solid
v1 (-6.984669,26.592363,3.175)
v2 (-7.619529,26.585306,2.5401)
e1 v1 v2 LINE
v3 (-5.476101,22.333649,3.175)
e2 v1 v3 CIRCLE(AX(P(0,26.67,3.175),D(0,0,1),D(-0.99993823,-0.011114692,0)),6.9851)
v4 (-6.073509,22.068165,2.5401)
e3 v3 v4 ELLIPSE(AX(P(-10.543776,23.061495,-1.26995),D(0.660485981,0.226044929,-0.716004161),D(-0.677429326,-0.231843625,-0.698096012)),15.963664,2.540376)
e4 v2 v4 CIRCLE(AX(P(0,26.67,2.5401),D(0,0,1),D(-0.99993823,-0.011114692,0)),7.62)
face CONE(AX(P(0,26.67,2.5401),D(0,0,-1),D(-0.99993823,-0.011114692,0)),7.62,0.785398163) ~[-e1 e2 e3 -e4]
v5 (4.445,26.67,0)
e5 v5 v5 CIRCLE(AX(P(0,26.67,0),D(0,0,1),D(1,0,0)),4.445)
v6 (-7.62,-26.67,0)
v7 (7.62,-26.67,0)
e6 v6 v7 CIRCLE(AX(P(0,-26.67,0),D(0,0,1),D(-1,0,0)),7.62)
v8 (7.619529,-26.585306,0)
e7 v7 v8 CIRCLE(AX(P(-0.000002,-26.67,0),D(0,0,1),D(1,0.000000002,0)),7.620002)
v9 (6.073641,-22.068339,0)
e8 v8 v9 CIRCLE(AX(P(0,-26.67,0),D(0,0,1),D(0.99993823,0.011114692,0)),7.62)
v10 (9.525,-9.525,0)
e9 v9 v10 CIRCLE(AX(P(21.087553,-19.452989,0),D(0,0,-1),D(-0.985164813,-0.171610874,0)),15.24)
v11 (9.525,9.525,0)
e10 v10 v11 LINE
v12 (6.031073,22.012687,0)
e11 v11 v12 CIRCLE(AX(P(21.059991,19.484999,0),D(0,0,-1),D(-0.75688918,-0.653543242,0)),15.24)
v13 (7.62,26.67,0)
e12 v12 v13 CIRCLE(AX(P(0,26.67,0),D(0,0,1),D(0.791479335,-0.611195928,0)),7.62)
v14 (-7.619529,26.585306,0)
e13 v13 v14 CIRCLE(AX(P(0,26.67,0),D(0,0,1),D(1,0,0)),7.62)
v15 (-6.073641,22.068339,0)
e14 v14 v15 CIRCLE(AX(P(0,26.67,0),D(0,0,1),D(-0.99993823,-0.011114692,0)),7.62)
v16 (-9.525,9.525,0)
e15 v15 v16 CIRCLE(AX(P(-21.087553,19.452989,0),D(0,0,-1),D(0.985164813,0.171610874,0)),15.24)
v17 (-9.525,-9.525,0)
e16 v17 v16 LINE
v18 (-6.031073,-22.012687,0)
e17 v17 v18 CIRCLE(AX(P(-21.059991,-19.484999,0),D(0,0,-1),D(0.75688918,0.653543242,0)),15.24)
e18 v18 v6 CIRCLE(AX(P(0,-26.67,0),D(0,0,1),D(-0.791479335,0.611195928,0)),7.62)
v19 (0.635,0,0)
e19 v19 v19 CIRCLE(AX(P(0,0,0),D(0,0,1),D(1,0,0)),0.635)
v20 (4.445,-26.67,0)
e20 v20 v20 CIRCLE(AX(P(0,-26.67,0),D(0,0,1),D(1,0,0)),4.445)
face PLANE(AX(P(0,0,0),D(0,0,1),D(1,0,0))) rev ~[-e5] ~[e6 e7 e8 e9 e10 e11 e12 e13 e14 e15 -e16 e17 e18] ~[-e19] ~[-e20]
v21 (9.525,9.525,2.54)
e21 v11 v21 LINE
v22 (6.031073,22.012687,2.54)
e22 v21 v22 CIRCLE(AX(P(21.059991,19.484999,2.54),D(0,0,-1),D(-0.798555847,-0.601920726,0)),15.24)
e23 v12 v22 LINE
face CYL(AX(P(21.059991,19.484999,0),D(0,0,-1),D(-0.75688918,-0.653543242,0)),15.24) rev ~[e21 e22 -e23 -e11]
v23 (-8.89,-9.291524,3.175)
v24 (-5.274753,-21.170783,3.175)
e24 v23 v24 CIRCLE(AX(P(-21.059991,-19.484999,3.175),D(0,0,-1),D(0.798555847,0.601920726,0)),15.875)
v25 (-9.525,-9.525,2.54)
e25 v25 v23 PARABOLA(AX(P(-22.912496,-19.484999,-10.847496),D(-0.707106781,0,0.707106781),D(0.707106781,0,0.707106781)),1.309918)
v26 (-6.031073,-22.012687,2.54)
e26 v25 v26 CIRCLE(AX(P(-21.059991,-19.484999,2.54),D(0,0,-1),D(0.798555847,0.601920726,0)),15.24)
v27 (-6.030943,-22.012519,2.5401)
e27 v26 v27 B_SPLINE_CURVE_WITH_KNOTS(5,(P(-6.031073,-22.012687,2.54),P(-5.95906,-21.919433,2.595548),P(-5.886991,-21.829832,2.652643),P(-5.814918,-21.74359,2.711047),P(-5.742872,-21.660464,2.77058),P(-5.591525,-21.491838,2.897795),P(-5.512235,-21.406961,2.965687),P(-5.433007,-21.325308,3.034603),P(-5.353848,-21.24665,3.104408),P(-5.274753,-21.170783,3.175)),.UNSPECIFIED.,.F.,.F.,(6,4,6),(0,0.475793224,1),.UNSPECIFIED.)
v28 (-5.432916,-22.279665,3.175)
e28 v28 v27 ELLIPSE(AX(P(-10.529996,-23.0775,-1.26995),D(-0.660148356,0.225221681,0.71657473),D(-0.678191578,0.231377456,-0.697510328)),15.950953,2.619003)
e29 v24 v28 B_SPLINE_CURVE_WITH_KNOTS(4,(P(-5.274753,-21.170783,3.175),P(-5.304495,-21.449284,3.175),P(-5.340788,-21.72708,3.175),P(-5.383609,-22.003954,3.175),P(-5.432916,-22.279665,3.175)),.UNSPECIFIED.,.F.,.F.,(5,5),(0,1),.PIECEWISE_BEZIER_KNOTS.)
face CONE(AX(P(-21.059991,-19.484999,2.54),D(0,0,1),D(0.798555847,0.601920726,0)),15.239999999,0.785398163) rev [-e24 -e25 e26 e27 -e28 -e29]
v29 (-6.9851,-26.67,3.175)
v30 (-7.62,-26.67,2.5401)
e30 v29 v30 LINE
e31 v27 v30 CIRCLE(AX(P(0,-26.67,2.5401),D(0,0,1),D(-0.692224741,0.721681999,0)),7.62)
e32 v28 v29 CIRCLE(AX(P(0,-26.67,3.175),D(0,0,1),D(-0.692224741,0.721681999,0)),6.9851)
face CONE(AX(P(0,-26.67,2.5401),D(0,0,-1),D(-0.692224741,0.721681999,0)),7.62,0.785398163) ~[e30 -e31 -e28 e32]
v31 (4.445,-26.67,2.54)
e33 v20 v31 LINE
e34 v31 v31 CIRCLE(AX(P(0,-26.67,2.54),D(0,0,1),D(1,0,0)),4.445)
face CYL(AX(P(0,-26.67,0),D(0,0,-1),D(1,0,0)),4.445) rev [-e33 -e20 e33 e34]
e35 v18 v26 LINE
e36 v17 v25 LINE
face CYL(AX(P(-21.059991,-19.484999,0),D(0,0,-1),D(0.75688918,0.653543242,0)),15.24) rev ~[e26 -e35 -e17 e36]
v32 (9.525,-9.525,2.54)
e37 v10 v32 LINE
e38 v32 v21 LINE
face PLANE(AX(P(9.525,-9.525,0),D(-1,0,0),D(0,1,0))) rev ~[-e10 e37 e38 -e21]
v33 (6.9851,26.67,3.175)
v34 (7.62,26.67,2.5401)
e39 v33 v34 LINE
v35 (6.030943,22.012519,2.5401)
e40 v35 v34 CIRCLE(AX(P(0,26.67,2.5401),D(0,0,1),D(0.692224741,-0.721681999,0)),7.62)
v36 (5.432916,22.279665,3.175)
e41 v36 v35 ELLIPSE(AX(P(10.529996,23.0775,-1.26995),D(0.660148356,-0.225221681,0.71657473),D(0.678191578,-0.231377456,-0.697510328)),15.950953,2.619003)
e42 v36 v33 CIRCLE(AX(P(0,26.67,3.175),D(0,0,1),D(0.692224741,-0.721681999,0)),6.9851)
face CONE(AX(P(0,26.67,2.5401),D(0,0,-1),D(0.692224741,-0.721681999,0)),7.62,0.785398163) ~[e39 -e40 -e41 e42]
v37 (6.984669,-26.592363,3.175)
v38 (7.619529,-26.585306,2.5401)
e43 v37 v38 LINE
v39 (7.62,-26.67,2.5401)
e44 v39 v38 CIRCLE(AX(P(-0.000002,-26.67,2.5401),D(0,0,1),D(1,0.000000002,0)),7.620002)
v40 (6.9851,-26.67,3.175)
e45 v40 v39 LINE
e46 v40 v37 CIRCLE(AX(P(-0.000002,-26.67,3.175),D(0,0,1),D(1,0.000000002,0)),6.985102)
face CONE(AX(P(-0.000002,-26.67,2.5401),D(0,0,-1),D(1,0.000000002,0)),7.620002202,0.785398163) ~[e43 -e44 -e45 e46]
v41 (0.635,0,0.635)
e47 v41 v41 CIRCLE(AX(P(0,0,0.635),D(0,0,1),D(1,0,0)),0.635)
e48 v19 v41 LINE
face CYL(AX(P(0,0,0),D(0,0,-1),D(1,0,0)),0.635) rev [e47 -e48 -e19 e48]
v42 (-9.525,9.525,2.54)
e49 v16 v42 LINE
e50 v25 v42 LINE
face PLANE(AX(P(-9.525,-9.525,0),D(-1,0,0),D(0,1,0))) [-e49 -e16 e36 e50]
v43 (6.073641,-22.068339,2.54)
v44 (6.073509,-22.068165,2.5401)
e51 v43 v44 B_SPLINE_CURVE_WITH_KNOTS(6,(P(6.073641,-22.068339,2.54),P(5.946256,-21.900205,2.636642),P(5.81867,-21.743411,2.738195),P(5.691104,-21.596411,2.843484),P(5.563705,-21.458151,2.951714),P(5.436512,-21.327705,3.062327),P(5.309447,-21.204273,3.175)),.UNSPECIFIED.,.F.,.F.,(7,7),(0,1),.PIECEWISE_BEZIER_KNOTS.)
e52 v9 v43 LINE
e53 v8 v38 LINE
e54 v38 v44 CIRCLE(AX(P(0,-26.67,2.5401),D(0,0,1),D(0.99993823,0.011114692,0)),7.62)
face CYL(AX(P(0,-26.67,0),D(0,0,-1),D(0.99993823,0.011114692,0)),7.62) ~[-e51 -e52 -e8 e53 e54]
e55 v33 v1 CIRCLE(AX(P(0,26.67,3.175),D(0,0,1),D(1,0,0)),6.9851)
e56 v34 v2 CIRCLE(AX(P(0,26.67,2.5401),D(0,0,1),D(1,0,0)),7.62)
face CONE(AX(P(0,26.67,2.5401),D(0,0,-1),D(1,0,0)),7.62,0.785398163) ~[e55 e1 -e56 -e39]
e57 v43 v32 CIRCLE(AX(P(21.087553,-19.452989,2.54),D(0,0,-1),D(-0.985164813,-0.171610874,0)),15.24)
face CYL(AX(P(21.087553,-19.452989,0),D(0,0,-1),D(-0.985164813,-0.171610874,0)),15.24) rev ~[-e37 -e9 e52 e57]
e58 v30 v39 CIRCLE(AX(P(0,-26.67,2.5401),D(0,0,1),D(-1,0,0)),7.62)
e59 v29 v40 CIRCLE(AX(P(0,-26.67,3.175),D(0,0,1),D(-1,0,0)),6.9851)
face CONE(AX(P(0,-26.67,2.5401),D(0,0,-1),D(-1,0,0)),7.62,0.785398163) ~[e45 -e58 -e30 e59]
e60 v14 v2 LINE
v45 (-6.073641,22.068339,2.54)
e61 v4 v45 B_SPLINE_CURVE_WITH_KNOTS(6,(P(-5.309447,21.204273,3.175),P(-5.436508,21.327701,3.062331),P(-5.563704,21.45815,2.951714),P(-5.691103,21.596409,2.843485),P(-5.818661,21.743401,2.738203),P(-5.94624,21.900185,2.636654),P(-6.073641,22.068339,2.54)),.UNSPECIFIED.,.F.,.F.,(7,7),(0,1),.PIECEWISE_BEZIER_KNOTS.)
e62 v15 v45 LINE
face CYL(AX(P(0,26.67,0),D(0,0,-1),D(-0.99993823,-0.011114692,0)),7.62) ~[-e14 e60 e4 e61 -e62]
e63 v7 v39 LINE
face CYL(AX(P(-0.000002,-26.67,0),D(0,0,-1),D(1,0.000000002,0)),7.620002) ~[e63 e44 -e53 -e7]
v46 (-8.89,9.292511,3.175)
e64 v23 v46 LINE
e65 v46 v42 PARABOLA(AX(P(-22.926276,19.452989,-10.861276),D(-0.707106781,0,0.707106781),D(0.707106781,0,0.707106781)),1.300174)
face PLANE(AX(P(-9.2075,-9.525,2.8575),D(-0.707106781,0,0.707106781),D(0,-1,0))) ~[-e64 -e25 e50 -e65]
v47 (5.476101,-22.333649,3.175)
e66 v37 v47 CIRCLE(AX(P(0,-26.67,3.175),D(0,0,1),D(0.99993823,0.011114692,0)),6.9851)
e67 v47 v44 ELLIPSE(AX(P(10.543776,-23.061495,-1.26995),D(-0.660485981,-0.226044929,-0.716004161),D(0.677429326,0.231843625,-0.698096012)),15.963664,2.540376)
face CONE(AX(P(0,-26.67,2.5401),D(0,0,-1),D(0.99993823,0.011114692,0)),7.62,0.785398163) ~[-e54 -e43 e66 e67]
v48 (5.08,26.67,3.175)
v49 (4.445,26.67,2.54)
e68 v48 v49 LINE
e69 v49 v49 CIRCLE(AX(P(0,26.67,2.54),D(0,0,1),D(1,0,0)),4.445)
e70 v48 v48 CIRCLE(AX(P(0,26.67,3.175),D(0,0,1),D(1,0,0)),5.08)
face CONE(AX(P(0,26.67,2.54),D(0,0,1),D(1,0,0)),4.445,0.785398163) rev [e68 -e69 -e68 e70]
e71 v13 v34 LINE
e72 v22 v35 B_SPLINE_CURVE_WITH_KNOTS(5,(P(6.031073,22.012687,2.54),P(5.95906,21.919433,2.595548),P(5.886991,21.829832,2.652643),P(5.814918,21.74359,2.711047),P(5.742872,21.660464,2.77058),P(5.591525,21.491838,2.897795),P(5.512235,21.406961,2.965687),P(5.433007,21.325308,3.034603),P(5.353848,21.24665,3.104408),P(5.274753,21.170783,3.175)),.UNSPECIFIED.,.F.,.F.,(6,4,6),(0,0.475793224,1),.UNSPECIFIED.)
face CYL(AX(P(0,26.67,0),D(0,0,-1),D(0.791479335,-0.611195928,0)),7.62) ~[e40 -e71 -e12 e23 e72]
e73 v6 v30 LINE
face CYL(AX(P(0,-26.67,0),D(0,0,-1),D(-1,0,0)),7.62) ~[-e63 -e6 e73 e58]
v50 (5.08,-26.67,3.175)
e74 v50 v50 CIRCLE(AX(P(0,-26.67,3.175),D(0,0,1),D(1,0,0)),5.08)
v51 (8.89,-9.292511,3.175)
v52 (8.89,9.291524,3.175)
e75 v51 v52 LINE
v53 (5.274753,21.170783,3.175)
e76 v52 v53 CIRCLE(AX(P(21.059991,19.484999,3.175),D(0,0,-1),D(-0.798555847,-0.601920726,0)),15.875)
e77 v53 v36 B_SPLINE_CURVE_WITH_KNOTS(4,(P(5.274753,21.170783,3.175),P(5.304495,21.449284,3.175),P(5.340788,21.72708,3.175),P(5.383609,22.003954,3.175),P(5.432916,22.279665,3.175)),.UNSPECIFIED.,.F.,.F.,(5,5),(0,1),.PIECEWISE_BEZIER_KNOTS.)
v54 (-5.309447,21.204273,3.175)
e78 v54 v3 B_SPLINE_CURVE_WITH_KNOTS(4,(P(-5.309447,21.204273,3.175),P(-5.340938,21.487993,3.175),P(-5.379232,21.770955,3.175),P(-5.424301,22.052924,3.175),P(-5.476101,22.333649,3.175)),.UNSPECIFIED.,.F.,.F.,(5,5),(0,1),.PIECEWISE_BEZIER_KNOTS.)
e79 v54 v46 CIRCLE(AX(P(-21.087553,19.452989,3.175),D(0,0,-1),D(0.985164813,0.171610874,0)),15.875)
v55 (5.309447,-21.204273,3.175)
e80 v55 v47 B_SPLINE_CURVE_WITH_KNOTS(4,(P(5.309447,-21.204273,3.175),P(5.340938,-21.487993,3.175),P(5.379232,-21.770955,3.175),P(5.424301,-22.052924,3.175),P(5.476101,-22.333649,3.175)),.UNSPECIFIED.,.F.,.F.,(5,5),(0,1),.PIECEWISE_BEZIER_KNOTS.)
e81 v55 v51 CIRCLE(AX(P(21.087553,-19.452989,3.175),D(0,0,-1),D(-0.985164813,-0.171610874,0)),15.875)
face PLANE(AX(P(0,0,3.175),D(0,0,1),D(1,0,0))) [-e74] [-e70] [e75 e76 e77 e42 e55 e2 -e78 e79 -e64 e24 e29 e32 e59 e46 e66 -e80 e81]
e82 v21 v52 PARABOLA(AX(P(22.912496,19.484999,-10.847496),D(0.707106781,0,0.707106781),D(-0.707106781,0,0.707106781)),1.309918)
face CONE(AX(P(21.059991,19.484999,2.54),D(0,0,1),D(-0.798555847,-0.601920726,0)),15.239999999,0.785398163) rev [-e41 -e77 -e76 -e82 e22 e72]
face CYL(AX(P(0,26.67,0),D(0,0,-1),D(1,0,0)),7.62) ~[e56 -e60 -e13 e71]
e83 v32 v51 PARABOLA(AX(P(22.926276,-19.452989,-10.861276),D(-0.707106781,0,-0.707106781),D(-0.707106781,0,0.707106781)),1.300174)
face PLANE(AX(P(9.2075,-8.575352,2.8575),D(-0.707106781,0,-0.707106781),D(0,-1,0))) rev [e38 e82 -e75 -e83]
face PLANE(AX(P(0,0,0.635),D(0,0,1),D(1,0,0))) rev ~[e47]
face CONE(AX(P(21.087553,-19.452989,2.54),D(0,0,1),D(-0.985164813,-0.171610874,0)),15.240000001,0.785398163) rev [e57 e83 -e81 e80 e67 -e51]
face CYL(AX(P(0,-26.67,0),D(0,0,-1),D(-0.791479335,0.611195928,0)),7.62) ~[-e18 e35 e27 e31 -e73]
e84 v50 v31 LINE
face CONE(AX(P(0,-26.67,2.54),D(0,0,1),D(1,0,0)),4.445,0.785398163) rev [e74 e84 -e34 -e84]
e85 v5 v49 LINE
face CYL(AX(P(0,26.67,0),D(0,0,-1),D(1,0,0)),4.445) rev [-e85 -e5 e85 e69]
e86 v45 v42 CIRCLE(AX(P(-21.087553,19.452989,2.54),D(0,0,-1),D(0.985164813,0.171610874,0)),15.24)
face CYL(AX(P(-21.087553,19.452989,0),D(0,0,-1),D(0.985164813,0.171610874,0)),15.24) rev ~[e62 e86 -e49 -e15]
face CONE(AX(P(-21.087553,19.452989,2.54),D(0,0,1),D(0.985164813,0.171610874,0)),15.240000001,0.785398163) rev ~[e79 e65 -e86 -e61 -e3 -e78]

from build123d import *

# Parameters (mm, degrees)
F0_W        = 19.05
F0_H        = 19.05
F0_R        = 0.635
F0_R_2      = 4.445
F1_DEPTH    = 3.175
F2_C1_SIZE  = 0.635
F2_C2_SIZE  = 0.635
F2_C3_SIZE  = 0.635
F2_C4_SIZE  = 0.635
F2_C5_SIZE  = 0.635
F2_C6_SIZE  = 0.635
F2_C7_SIZE  = 0.635
F2_C8_SIZE  = 0.635
F2_C9_SIZE  = 0.6349
F2_C10_SIZE = 0.6349
F3_DEPTH    = 0.635


# Not quite as in the source:
# - a fillet or chamfer is up to 0.001 mm smaller than in the source, because OpenCascade refuses the exact size


with BuildPart() as f1:
    # F0 (on Top) → F1 (new body)
    with BuildSketch(Plane.XY):
        Rectangle(F0_W, F0_H)
        Circle(F0_R, mode=Mode.SUBTRACT)
        with BuildLine():
            Line((9.525, -9.525), (-9.525, -9.525))
            ThreePointArc((-9.525, -9.525), (-6.3836187271, -15.3786997104), (-6.0310725347, -22.012687032))
            ThreePointArc((-6.0310725347, -22.012687032), (0.0350329382, -19.0500805324), (6.0736411029, -22.0683390224))
            ThreePointArc((6.0736411029, -22.0683390224), (6.3936440411, -15.409890989), (9.525, -9.525))
        make_face()
        with BuildLine():
            ThreePointArc((6.0736411029, -22.0683390224), (0.0350329382, -19.0500805324), (-6.0310725347, -22.012687032))
            ThreePointArc((-6.0310725347, -22.012687032), (-6.6363180101, -24.4058987838), (-7.62, -26.67))
            ThreePointArc((-7.62, -26.67), (0, -34.29), (7.62, -26.67))
            ThreePointArc((7.62, -26.67), (7.619882327, -26.6276523681), (7.6195293118, -26.5853060441))
            ThreePointArc((7.6195293118, -26.5853060441), (6.6686101992, -24.3877327559), (6.0736411029, -22.0683390224))
        make_face()
        with Locations((0, -26.67)):
            Circle(F0_R_2, mode=Mode.SUBTRACT)
        with BuildLine():
            ThreePointArc((-7.62, -26.67), (-6.6363180101, -24.4058987838), (-6.0310725347, -22.012687032))
            ThreePointArc((-6.0310725347, -22.012687032), (-7.2118365454, -24.2095501137), (-7.62, -26.67))
        make_face()
        with BuildLine():
            ThreePointArc((7.6195293118, -26.5853060441), (7.2094713239, -24.202628275), (6.0736411029, -22.0683390224))
            ThreePointArc((6.0736411029, -22.0683390224), (6.6686101992, -24.3877327559), (7.6195293118, -26.5853060441))
        make_face()
        with BuildLine():
            ThreePointArc((-6.0736411029, 22.0683390224), (-6.3936440411, 15.409890989), (-9.525, 9.525))
            Line((-9.525, 9.525), (9.525, 9.525))
            ThreePointArc((9.525, 9.525), (6.3836187271, 15.3786997104), (6.0310725347, 22.012687032))
            ThreePointArc((6.0310725347, 22.012687032), (-0.0350329382, 19.0500805324), (-6.0736411029, 22.0683390224))
        make_face()
        with BuildLine():
            ThreePointArc((-7.6195293118, 26.5853060441), (-6.6686101992, 24.3877327559), (-6.0736411029, 22.0683390224))
            ThreePointArc((-6.0736411029, 22.0683390224), (-0.0350329382, 19.0500805324), (6.0310725347, 22.012687032))
            ThreePointArc((6.0310725347, 22.012687032), (6.6363180101, 24.4058987838), (7.62, 26.67))
            ThreePointArc((7.62, 26.67), (-0.0423476319, 34.289882327), (-7.6195293118, 26.5853060441))
        make_face()
        with Locations((0, 26.67)):
            Circle(F0_R_2, mode=Mode.SUBTRACT)
        with BuildLine():
            ThreePointArc((-7.6195293118, 26.5853060441), (-7.2094713239, 24.202628275), (-6.0736411029, 22.0683390224))
            ThreePointArc((-6.0736411029, 22.0683390224), (-6.6686101992, 24.3877327559), (-7.6195293118, 26.5853060441))
        make_face()
        with BuildLine():
            ThreePointArc((7.62, 26.67), (6.6363180101, 24.4058987838), (6.0310725347, 22.012687032))
            ThreePointArc((6.0310725347, 22.012687032), (7.2118365454, 24.2095501137), (7.62, 26.67))
        make_face()
        Circle(F0_R)
    extrude(amount=F1_DEPTH)

    # F2: chamfer of 0.635 on 10 edges, made by hand

    # F2_c1
    f2_c1_edges = [f1.edges().sort_by_distance(p)[0] for p in [
        (-9.525, 0, 3.175),
    ]]
    chamfer(f2_c1_edges, length=F2_C1_SIZE)

    # F2_c2
    f2_c2_edges = [f1.edges().sort_by_distance(p)[0] for p in [
        (-6.2554888364, -15.867774564, 3.175),
    ]]
    chamfer(f2_c2_edges, length=F2_C2_SIZE)

    # F2_c3
    f2_c3_edges = [f1.edges().sort_by_distance(p)[0] for p in [
        (6.3936440411, -15.409890989, 3.175),
    ]]
    chamfer(f2_c3_edges, length=F2_C3_SIZE)

    # F2_c4
    f2_c4_edges = [f1.edges().sort_by_distance(p)[0] for p in [
        (9.525, 0.4748240758, 3.175),
    ]]
    chamfer(f2_c4_edges, length=F2_C4_SIZE)

    # F2_c5
    f2_c5_edges = [f1.edges().sort_by_distance(p)[0] for p in [
        (6.2554888364, 15.867774564, 3.175),
    ]]
    chamfer(f2_c5_edges, length=F2_C5_SIZE)

    # F2_c6
    f2_c6_edges = [f1.edges().sort_by_distance(p)[0] for p in [
        (-6.2671958343, 15.9012829536, 3.175),
    ]]
    chamfer(f2_c6_edges, length=F2_C6_SIZE)

    # F2_c7
    f2_c7_edges = [f1.edges().sort_by_distance(p)[0] for p in [
        (-4.445, -26.67, 3.175),
    ]]
    chamfer(f2_c7_edges, length=F2_C7_SIZE)

    # F2_c8
    f2_c8_edges = [f1.edges().sort_by_distance(p)[0] for p in [
        (-4.445, 26.67, 3.175),
    ]]
    chamfer(f2_c8_edges, length=F2_C8_SIZE)

    # F2_c9 (size 0.635 in the source; OpenCascade refuses exactly that, so slightly less here)
    f2_c9_edges = [f1.edges().sort_by_distance(p)[0] for p in [
        (-0.0350329382, -34.2899194676, 3.175),
    ]]
    chamfer(f2_c9_edges, length=F2_C9_SIZE)

    # F2_c10 (size 0.635 in the source; OpenCascade refuses exactly that, so slightly less here)
    f2_c10_edges = [f1.edges().sort_by_distance(p)[0] for p in [
        (0.0350329382, 34.2899194676, 3.175),
    ]]
    chamfer(f2_c10_edges, length=F2_C10_SIZE)

    # F0 (on Top) → F3 (cut)
    with BuildSketch(Plane.XY):
        Circle(F0_R)
    extrude(amount=F3_DEPTH, mode=Mode.SUBTRACT)


solid = f1.part
